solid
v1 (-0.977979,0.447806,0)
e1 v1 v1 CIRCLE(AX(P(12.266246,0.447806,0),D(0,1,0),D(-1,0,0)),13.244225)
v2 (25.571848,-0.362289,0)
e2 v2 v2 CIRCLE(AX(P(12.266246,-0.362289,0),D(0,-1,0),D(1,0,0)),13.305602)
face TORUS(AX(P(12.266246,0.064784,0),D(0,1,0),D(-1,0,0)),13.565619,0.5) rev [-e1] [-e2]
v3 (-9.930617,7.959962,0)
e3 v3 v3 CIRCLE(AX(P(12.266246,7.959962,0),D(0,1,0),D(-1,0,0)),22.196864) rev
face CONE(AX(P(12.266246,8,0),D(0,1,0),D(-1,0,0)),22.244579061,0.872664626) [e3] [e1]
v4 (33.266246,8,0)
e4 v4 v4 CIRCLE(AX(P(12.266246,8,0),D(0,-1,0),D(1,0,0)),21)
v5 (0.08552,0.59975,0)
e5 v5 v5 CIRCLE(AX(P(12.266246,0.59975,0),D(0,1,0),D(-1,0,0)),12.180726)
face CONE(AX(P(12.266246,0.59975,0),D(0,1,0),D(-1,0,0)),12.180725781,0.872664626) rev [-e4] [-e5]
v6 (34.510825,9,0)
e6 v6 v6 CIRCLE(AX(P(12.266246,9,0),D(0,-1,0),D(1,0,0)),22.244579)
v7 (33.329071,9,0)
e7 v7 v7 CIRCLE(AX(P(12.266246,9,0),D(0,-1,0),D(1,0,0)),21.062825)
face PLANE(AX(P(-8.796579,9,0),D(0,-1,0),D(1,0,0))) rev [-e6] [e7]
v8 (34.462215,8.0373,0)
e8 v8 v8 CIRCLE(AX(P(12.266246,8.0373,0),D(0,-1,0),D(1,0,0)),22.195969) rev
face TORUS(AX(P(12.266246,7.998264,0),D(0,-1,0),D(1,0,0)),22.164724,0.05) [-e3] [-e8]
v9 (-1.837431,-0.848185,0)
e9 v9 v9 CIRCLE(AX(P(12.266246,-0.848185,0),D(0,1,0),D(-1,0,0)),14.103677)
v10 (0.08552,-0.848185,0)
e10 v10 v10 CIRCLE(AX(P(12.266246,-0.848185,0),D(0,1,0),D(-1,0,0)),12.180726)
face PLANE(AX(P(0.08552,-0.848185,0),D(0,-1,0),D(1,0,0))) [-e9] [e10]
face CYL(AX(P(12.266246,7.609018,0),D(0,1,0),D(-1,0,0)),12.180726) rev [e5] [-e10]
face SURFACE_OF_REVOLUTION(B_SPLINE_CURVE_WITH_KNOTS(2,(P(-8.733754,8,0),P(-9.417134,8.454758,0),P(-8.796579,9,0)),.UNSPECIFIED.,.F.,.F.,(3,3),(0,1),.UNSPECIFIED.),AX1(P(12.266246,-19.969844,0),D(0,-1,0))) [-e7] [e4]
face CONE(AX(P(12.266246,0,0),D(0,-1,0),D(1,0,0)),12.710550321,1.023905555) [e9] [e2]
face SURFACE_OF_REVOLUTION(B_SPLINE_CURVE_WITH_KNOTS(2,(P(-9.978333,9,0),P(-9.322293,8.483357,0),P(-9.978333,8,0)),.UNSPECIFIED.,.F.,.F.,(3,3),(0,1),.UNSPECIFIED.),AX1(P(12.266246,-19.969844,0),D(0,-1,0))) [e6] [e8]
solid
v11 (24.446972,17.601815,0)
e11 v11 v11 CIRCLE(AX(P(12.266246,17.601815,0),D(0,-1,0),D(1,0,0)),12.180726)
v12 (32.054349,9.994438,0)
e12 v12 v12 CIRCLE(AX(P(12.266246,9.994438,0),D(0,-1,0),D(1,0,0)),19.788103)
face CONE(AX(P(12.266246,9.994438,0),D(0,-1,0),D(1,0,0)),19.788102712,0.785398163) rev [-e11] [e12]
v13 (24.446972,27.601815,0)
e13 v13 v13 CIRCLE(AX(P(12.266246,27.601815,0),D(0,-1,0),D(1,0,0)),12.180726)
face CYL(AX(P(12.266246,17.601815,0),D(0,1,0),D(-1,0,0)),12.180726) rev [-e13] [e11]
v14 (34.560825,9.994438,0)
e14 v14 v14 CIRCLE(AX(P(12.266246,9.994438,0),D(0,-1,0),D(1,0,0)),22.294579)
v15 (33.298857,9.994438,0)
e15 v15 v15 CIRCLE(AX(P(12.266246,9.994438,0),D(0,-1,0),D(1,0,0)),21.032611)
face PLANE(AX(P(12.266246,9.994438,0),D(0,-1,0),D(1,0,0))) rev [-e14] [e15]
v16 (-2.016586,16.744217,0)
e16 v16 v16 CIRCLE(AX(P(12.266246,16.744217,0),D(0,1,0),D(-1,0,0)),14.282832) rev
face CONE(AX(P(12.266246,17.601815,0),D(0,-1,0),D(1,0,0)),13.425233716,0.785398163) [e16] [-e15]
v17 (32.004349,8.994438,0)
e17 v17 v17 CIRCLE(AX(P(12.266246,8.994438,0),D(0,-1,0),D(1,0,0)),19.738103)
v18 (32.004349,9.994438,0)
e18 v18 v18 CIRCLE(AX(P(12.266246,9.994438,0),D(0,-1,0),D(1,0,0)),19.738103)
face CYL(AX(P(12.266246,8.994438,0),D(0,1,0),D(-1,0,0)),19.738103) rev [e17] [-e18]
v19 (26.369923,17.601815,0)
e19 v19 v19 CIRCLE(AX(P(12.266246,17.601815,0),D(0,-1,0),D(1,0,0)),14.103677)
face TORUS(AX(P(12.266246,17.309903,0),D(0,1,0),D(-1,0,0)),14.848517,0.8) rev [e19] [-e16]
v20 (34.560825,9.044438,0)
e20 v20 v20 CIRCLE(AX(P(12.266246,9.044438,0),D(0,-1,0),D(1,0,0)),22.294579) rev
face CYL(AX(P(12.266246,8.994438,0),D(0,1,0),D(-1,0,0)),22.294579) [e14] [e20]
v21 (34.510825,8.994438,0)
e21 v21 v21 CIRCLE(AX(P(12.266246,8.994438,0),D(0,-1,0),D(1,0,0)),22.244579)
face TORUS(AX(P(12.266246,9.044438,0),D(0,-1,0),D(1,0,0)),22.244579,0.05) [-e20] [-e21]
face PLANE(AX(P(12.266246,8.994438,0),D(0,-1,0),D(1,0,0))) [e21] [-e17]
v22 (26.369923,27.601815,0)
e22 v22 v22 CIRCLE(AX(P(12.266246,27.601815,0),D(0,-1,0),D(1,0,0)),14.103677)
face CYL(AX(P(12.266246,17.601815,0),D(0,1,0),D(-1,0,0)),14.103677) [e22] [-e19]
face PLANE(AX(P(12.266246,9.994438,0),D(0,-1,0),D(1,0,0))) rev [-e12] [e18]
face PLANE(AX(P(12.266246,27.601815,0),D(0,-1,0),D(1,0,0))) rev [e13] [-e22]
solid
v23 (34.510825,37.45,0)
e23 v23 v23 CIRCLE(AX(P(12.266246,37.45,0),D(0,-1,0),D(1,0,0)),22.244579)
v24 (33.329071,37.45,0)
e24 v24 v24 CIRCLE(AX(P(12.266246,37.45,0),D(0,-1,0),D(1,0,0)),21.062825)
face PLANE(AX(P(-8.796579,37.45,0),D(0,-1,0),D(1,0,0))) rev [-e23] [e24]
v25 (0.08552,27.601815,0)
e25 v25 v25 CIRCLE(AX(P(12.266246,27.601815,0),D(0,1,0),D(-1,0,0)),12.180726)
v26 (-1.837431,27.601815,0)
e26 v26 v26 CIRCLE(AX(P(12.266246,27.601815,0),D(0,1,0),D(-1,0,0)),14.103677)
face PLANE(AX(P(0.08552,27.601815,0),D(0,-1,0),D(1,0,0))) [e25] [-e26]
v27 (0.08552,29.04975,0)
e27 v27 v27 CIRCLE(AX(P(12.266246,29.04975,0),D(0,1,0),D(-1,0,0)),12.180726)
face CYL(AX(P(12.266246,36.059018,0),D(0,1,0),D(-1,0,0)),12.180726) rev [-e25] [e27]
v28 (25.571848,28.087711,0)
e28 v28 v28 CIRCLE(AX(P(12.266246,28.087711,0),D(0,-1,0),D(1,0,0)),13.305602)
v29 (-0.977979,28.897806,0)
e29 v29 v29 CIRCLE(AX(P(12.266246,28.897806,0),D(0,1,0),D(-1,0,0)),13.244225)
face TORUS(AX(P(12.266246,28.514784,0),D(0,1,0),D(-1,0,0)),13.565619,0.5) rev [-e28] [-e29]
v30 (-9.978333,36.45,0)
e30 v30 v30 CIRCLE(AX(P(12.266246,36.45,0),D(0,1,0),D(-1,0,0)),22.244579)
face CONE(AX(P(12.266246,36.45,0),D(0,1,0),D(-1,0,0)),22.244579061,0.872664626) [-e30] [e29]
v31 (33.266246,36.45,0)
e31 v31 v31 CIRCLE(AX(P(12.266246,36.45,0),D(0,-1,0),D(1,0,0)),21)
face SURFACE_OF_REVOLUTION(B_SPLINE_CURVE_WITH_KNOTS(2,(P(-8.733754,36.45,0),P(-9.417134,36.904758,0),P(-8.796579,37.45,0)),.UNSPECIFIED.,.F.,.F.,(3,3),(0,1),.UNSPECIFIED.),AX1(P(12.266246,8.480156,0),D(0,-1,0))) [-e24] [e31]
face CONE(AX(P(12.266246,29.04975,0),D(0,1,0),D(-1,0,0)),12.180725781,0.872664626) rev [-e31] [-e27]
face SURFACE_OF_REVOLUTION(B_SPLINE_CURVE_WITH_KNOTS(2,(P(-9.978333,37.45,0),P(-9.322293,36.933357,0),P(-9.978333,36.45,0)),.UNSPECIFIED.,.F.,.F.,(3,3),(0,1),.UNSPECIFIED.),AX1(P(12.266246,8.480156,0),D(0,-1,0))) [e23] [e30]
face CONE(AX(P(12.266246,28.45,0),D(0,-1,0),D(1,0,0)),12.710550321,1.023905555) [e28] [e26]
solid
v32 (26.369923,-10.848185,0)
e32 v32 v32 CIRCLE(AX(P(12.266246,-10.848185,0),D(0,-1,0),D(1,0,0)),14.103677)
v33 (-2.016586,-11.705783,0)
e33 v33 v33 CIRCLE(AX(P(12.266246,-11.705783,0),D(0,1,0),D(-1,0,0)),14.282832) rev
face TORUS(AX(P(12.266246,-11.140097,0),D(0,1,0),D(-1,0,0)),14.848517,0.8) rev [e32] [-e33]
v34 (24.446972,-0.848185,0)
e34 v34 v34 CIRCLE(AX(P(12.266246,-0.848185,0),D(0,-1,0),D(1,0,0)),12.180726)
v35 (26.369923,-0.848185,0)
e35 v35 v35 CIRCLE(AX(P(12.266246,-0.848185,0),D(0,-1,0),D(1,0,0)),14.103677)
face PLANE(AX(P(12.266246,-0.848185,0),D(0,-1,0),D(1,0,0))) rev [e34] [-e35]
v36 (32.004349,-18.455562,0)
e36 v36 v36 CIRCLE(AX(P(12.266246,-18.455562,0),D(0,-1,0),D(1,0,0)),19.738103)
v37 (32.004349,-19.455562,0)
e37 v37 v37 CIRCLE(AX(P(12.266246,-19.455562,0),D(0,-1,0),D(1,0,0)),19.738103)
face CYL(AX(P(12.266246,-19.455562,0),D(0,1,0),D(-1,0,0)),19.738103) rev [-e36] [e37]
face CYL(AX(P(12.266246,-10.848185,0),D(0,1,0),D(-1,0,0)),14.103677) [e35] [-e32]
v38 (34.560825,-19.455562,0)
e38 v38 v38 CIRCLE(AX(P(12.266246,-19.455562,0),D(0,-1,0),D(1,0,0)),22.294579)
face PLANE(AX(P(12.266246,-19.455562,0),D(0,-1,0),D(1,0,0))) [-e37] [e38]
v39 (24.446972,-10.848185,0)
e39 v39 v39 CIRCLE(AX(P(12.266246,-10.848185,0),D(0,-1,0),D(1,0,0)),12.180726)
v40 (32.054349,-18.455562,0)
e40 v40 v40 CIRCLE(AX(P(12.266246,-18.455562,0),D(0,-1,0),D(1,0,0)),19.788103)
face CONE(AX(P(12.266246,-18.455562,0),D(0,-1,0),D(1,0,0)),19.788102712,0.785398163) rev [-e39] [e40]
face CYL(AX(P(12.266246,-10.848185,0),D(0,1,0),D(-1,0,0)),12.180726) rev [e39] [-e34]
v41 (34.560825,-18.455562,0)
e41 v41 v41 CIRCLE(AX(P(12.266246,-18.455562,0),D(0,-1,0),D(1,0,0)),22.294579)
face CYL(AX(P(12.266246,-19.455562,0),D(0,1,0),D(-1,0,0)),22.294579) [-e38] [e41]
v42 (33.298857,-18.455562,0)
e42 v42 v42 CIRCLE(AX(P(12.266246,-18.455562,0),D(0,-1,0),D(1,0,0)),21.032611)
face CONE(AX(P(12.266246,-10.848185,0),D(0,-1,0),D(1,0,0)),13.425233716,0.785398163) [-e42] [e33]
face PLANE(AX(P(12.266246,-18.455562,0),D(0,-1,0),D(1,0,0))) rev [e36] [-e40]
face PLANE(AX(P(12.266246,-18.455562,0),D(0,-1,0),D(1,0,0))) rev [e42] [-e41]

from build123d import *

# Parameters (mm, degrees)
ACTIVE_FILLET_R     = 0.5
SKETCH11_R          = 14.103676921920666
SKETCH11_R_2        = 12.180725781348816
COLLAR_DEPTH        = 10
PASSIVE_FILLET_R    = 0.8
SKETCH18_R          = 22.29457906148835
SKETCH18_R_2        = 19.738102711916127
BOSS_EXTRUDE4_DEPTH = 1
FILLET3_R           = 0.05
FILLET4_R           = 0.05


# Read off the part's stored shape, not the designer's step: Body-Move/Copy2
with BuildPart() as part:
    # Sketch1 → Main Active (revolve)
    with BuildSketch(Plane.XY):
        Polygon((-0.44430417046757187, 0), (-9.97833291122136, 8), (-8.733753849733018, 8), (0.08552036891816808, 0.5997502558785777), (0.08552036891816808, -0.8481847341285212), (-1.8374307716536824, -0.8481847341285211), align=None)
    revolve(axis=Axis((12.266246150266982, 7.609018032819944, 0), (1.1e-16, -1, 0)))

    # Active fillet
    active_fillet_edges = [part.edges().sort_by_distance(p)[0] for p in [
        (24.976796471001535, 3.23e-15, -1.56e-15),
    ]]
    fillet(active_fillet_edges, radius=ACTIVE_FILLET_R)

    # Sketch17 → Neck Curve (revolve)
    with BuildSketch(Plane.XY, mode=Mode.PRIVATE) as neck_curve_sk:
        with BuildLine():
            Line((-9.978332911221361, 8), (-8.733753849733016, 8))
            add(Edge.make_bspline(
                [(-8.733753849733016, 8), (-9.417134243608169, 8.454758024892763), (-8.796578828718458, 9.000000000000004)],
                knots=[0, 0, 0, 1, 1, 1], degree=2))
            Line((-8.796578828718458, 9.000000000000004), (-9.978332911221361, 9.000000000000004))
            add(Edge.make_bspline(
                [(-9.978332911221361, 8), (-9.322292514147533, 8.483356916822304), (-9.978332911221361, 9.000000000000004)],
                knots=[0, 0, 0, 1, 1, 1], degree=2))
        make_face()
    revolve(neck_curve_sk.sketch.rotate(Axis((12.266246150266984, -19.969844330252183, 0), (-1.2e-16, 1, 0)), 180), axis=Axis((12.266246150266984, -19.969844330252183, 0), (-1.2e-16, 1, 0)))

    # Fillet3
    fillet3_edges = [part.edges().sort_by_distance(p)[0] for p in [
        (12.266246150266975, 8.000000000000002, -22.24457906148834),
    ]]
    fillet(fillet3_edges, radius=FILLET3_R)


with BuildPart() as body_2:
    # Sketch11 → collar (new body)
    with BuildSketch(Plane.XZ.offset(0.848184734128521)):
        with Locations((12.266246150266984, 0)):
            Circle(SKETCH11_R)
        with Locations((12.266246150266984, 0)):
            Circle(SKETCH11_R_2, mode=Mode.SUBTRACT)
    extrude(amount=COLLAR_DEPTH)

    # Sketch14 → Passive Element (revolve)
    with BuildSketch(Plane.XY, mode=Mode.PRIVATE) as passive_element_sk:
        Polygon((-1.1589875659701498, -10.848184734128521), (-8.766364496537454, -18.455561664695857), (-7.521856561649136, -18.45556166469586), (0.08552036891816897, -10.848184734128521), align=None)
    revolve(passive_element_sk.sketch.rotate(Axis((12.266246150266984, -19.969844330252183, 0), (-1.2e-16, 1, 0)), 180), axis=Axis((12.266246150266984, -19.969844330252183, 0), (-1.2e-16, 1, 0)))

    # Passive Fillet
    # the kernel refuses this fillet: 0.8 mm, written as the material it adds along each edge
    with BuildSketch(Plane(origin=(12.266246150266982, -10.84818473412852, 0), x_dir=(1, 1.3e-16, 1.2e-16), z_dir=(-1.2e-16, 0, 1))) as passive_fillet_piece_1:
        with BuildLine():
            CenterArc((14.848517187625331, -0.2919126214897256), PASSIVE_FILLET_R, 158.5991389184751, 66.40086108152474)
            Line((14.282831762676091, -0.8575980464389624), (14.271518054177106, -0.8689117549379476))
            Line((14.271518054177106, -0.8689117549379476), (13.413920007738147, -0.01131370849898516))
            Line((13.413920007738147, -0.01131370849898516), (13.425233716237132, 0.01600000000000001))
            ThreePointArc((13.425233716237132, 0.01600000000000001), (13.764455319078904, 0.01599999999999997), (14.088780116606573, 0.00583825242979499))
            Line((14.088780116606573, 0.00583825242979499), (14.103676921920668, -9e-17))
        make_face()
    revolve(axis=Axis((12.266246150266982, -10.84818473412852, 0), (-1.2e-16, 1, 0)))

    # Sketch18 → Boss-Extrude4 (add)
    with BuildSketch(Plane.XZ.offset(18.455561664695857)):
        with Locations((12.266246150266984, 0)):
            Circle(SKETCH18_R)
        with Locations((12.266246150266984, 0)):
            Circle(SKETCH18_R_2, mode=Mode.SUBTRACT)
    extrude(amount=BOSS_EXTRUDE4_DEPTH)


with BuildPart() as body_3:
    # Body-Move/Copy2 outline → Body-Move/Copy2 (revolve)
    with BuildSketch(Plane(origin=(12.26624615, 0, 0), x_dir=(1, 0, 0), z_dir=(0, 0, 1))):
        with BuildLine():
            Line((14.103676922, 27.601815266), (13.305602068, 28.087711456))
            ThreePointArc((13.305602068, 28.087711456), (13.067048008, 28.477010025), (13.24422527, 28.897806453))
            Line((13.24422527, 28.897806453), (22.244579061, 36.45))
            add(Edge.make_bspline(
                [(22.244579061, 37.45), (21.58853866441453, 36.9333569168223), (22.244579061, 36.45)],
                knots=[0, 0, 0, 1, 1, 1], degree=2))
            Line((22.244579061, 37.45), (21.062824979, 37.45))
            add(Edge.make_bspline(
                [(21.062824979, 37.45), (21.683380393875126, 36.904758024892814), (21, 36.45)],
                knots=[0.04818103665717954, 0.04818103665717954, 0.04818103665717954, 1.048181036657181, 1.048181036657181, 1.048181036657181], degree=2))
            Line((21, 36.45), (12.180725781, 29.049750256))
            Line((12.180725781, 29.049750256), (12.180725781, 27.601815266))
            Line((12.180725781, 27.601815266), (14.103676922, 27.601815266))
        make_face()
    revolve(axis=Axis((12.26624615, 0, 0), (0, 1, 0)))


with BuildPart() as body_4:
    # Body-Move_Copy2 2 outline → Body-Move_Copy2 2 (revolve)
    with BuildSketch(Plane(origin=(12.26624615, 0, 0), x_dir=(1, 0, 0), z_dir=(0, 0, 1))):
        with BuildLine():
            Line((14.103676922, 27.601815266), (12.180725781, 27.601815266))
            Line((12.180725781, 27.601815266), (12.180725781, 17.601815266))
            Line((12.180725781, 17.601815266), (19.788102712, 9.994438335))
            Line((19.788102712, 9.994438335), (19.738102712, 9.994438335))
            Line((19.738102712, 9.994438335), (19.738102712, 8.994438335))
            Line((19.738102712, 8.994438335), (22.294579061, 8.994438335))
            Line((22.294579061, 8.994438335), (22.294579061, 9.994438335))
            Line((22.294579061, 9.994438335), (21.032610647, 9.994438335))
            Line((21.032610647, 9.994438335), (14.282831763, 16.744217219))
            ThreePointArc((14.282831763, 16.744217219), (14.065422047, 17.146311687), (14.103676922, 17.601815266))
            Line((14.103676922, 17.601815266), (14.103676922, 27.601815266))
        make_face()
    revolve(axis=Axis((12.26624615, 0, 0), (0, 1, 0)))

    # Fillet4
    fillet4_edges = [body_4.edges().sort_by_distance(p)[0] for p in [
        (-10.028332911, 8.994438335, -2.73e-15),
    ]]
    fillet(fillet4_edges, radius=FILLET4_R)


solid = Compound([part.part, body_2.part, body_3.part, body_4.part])
